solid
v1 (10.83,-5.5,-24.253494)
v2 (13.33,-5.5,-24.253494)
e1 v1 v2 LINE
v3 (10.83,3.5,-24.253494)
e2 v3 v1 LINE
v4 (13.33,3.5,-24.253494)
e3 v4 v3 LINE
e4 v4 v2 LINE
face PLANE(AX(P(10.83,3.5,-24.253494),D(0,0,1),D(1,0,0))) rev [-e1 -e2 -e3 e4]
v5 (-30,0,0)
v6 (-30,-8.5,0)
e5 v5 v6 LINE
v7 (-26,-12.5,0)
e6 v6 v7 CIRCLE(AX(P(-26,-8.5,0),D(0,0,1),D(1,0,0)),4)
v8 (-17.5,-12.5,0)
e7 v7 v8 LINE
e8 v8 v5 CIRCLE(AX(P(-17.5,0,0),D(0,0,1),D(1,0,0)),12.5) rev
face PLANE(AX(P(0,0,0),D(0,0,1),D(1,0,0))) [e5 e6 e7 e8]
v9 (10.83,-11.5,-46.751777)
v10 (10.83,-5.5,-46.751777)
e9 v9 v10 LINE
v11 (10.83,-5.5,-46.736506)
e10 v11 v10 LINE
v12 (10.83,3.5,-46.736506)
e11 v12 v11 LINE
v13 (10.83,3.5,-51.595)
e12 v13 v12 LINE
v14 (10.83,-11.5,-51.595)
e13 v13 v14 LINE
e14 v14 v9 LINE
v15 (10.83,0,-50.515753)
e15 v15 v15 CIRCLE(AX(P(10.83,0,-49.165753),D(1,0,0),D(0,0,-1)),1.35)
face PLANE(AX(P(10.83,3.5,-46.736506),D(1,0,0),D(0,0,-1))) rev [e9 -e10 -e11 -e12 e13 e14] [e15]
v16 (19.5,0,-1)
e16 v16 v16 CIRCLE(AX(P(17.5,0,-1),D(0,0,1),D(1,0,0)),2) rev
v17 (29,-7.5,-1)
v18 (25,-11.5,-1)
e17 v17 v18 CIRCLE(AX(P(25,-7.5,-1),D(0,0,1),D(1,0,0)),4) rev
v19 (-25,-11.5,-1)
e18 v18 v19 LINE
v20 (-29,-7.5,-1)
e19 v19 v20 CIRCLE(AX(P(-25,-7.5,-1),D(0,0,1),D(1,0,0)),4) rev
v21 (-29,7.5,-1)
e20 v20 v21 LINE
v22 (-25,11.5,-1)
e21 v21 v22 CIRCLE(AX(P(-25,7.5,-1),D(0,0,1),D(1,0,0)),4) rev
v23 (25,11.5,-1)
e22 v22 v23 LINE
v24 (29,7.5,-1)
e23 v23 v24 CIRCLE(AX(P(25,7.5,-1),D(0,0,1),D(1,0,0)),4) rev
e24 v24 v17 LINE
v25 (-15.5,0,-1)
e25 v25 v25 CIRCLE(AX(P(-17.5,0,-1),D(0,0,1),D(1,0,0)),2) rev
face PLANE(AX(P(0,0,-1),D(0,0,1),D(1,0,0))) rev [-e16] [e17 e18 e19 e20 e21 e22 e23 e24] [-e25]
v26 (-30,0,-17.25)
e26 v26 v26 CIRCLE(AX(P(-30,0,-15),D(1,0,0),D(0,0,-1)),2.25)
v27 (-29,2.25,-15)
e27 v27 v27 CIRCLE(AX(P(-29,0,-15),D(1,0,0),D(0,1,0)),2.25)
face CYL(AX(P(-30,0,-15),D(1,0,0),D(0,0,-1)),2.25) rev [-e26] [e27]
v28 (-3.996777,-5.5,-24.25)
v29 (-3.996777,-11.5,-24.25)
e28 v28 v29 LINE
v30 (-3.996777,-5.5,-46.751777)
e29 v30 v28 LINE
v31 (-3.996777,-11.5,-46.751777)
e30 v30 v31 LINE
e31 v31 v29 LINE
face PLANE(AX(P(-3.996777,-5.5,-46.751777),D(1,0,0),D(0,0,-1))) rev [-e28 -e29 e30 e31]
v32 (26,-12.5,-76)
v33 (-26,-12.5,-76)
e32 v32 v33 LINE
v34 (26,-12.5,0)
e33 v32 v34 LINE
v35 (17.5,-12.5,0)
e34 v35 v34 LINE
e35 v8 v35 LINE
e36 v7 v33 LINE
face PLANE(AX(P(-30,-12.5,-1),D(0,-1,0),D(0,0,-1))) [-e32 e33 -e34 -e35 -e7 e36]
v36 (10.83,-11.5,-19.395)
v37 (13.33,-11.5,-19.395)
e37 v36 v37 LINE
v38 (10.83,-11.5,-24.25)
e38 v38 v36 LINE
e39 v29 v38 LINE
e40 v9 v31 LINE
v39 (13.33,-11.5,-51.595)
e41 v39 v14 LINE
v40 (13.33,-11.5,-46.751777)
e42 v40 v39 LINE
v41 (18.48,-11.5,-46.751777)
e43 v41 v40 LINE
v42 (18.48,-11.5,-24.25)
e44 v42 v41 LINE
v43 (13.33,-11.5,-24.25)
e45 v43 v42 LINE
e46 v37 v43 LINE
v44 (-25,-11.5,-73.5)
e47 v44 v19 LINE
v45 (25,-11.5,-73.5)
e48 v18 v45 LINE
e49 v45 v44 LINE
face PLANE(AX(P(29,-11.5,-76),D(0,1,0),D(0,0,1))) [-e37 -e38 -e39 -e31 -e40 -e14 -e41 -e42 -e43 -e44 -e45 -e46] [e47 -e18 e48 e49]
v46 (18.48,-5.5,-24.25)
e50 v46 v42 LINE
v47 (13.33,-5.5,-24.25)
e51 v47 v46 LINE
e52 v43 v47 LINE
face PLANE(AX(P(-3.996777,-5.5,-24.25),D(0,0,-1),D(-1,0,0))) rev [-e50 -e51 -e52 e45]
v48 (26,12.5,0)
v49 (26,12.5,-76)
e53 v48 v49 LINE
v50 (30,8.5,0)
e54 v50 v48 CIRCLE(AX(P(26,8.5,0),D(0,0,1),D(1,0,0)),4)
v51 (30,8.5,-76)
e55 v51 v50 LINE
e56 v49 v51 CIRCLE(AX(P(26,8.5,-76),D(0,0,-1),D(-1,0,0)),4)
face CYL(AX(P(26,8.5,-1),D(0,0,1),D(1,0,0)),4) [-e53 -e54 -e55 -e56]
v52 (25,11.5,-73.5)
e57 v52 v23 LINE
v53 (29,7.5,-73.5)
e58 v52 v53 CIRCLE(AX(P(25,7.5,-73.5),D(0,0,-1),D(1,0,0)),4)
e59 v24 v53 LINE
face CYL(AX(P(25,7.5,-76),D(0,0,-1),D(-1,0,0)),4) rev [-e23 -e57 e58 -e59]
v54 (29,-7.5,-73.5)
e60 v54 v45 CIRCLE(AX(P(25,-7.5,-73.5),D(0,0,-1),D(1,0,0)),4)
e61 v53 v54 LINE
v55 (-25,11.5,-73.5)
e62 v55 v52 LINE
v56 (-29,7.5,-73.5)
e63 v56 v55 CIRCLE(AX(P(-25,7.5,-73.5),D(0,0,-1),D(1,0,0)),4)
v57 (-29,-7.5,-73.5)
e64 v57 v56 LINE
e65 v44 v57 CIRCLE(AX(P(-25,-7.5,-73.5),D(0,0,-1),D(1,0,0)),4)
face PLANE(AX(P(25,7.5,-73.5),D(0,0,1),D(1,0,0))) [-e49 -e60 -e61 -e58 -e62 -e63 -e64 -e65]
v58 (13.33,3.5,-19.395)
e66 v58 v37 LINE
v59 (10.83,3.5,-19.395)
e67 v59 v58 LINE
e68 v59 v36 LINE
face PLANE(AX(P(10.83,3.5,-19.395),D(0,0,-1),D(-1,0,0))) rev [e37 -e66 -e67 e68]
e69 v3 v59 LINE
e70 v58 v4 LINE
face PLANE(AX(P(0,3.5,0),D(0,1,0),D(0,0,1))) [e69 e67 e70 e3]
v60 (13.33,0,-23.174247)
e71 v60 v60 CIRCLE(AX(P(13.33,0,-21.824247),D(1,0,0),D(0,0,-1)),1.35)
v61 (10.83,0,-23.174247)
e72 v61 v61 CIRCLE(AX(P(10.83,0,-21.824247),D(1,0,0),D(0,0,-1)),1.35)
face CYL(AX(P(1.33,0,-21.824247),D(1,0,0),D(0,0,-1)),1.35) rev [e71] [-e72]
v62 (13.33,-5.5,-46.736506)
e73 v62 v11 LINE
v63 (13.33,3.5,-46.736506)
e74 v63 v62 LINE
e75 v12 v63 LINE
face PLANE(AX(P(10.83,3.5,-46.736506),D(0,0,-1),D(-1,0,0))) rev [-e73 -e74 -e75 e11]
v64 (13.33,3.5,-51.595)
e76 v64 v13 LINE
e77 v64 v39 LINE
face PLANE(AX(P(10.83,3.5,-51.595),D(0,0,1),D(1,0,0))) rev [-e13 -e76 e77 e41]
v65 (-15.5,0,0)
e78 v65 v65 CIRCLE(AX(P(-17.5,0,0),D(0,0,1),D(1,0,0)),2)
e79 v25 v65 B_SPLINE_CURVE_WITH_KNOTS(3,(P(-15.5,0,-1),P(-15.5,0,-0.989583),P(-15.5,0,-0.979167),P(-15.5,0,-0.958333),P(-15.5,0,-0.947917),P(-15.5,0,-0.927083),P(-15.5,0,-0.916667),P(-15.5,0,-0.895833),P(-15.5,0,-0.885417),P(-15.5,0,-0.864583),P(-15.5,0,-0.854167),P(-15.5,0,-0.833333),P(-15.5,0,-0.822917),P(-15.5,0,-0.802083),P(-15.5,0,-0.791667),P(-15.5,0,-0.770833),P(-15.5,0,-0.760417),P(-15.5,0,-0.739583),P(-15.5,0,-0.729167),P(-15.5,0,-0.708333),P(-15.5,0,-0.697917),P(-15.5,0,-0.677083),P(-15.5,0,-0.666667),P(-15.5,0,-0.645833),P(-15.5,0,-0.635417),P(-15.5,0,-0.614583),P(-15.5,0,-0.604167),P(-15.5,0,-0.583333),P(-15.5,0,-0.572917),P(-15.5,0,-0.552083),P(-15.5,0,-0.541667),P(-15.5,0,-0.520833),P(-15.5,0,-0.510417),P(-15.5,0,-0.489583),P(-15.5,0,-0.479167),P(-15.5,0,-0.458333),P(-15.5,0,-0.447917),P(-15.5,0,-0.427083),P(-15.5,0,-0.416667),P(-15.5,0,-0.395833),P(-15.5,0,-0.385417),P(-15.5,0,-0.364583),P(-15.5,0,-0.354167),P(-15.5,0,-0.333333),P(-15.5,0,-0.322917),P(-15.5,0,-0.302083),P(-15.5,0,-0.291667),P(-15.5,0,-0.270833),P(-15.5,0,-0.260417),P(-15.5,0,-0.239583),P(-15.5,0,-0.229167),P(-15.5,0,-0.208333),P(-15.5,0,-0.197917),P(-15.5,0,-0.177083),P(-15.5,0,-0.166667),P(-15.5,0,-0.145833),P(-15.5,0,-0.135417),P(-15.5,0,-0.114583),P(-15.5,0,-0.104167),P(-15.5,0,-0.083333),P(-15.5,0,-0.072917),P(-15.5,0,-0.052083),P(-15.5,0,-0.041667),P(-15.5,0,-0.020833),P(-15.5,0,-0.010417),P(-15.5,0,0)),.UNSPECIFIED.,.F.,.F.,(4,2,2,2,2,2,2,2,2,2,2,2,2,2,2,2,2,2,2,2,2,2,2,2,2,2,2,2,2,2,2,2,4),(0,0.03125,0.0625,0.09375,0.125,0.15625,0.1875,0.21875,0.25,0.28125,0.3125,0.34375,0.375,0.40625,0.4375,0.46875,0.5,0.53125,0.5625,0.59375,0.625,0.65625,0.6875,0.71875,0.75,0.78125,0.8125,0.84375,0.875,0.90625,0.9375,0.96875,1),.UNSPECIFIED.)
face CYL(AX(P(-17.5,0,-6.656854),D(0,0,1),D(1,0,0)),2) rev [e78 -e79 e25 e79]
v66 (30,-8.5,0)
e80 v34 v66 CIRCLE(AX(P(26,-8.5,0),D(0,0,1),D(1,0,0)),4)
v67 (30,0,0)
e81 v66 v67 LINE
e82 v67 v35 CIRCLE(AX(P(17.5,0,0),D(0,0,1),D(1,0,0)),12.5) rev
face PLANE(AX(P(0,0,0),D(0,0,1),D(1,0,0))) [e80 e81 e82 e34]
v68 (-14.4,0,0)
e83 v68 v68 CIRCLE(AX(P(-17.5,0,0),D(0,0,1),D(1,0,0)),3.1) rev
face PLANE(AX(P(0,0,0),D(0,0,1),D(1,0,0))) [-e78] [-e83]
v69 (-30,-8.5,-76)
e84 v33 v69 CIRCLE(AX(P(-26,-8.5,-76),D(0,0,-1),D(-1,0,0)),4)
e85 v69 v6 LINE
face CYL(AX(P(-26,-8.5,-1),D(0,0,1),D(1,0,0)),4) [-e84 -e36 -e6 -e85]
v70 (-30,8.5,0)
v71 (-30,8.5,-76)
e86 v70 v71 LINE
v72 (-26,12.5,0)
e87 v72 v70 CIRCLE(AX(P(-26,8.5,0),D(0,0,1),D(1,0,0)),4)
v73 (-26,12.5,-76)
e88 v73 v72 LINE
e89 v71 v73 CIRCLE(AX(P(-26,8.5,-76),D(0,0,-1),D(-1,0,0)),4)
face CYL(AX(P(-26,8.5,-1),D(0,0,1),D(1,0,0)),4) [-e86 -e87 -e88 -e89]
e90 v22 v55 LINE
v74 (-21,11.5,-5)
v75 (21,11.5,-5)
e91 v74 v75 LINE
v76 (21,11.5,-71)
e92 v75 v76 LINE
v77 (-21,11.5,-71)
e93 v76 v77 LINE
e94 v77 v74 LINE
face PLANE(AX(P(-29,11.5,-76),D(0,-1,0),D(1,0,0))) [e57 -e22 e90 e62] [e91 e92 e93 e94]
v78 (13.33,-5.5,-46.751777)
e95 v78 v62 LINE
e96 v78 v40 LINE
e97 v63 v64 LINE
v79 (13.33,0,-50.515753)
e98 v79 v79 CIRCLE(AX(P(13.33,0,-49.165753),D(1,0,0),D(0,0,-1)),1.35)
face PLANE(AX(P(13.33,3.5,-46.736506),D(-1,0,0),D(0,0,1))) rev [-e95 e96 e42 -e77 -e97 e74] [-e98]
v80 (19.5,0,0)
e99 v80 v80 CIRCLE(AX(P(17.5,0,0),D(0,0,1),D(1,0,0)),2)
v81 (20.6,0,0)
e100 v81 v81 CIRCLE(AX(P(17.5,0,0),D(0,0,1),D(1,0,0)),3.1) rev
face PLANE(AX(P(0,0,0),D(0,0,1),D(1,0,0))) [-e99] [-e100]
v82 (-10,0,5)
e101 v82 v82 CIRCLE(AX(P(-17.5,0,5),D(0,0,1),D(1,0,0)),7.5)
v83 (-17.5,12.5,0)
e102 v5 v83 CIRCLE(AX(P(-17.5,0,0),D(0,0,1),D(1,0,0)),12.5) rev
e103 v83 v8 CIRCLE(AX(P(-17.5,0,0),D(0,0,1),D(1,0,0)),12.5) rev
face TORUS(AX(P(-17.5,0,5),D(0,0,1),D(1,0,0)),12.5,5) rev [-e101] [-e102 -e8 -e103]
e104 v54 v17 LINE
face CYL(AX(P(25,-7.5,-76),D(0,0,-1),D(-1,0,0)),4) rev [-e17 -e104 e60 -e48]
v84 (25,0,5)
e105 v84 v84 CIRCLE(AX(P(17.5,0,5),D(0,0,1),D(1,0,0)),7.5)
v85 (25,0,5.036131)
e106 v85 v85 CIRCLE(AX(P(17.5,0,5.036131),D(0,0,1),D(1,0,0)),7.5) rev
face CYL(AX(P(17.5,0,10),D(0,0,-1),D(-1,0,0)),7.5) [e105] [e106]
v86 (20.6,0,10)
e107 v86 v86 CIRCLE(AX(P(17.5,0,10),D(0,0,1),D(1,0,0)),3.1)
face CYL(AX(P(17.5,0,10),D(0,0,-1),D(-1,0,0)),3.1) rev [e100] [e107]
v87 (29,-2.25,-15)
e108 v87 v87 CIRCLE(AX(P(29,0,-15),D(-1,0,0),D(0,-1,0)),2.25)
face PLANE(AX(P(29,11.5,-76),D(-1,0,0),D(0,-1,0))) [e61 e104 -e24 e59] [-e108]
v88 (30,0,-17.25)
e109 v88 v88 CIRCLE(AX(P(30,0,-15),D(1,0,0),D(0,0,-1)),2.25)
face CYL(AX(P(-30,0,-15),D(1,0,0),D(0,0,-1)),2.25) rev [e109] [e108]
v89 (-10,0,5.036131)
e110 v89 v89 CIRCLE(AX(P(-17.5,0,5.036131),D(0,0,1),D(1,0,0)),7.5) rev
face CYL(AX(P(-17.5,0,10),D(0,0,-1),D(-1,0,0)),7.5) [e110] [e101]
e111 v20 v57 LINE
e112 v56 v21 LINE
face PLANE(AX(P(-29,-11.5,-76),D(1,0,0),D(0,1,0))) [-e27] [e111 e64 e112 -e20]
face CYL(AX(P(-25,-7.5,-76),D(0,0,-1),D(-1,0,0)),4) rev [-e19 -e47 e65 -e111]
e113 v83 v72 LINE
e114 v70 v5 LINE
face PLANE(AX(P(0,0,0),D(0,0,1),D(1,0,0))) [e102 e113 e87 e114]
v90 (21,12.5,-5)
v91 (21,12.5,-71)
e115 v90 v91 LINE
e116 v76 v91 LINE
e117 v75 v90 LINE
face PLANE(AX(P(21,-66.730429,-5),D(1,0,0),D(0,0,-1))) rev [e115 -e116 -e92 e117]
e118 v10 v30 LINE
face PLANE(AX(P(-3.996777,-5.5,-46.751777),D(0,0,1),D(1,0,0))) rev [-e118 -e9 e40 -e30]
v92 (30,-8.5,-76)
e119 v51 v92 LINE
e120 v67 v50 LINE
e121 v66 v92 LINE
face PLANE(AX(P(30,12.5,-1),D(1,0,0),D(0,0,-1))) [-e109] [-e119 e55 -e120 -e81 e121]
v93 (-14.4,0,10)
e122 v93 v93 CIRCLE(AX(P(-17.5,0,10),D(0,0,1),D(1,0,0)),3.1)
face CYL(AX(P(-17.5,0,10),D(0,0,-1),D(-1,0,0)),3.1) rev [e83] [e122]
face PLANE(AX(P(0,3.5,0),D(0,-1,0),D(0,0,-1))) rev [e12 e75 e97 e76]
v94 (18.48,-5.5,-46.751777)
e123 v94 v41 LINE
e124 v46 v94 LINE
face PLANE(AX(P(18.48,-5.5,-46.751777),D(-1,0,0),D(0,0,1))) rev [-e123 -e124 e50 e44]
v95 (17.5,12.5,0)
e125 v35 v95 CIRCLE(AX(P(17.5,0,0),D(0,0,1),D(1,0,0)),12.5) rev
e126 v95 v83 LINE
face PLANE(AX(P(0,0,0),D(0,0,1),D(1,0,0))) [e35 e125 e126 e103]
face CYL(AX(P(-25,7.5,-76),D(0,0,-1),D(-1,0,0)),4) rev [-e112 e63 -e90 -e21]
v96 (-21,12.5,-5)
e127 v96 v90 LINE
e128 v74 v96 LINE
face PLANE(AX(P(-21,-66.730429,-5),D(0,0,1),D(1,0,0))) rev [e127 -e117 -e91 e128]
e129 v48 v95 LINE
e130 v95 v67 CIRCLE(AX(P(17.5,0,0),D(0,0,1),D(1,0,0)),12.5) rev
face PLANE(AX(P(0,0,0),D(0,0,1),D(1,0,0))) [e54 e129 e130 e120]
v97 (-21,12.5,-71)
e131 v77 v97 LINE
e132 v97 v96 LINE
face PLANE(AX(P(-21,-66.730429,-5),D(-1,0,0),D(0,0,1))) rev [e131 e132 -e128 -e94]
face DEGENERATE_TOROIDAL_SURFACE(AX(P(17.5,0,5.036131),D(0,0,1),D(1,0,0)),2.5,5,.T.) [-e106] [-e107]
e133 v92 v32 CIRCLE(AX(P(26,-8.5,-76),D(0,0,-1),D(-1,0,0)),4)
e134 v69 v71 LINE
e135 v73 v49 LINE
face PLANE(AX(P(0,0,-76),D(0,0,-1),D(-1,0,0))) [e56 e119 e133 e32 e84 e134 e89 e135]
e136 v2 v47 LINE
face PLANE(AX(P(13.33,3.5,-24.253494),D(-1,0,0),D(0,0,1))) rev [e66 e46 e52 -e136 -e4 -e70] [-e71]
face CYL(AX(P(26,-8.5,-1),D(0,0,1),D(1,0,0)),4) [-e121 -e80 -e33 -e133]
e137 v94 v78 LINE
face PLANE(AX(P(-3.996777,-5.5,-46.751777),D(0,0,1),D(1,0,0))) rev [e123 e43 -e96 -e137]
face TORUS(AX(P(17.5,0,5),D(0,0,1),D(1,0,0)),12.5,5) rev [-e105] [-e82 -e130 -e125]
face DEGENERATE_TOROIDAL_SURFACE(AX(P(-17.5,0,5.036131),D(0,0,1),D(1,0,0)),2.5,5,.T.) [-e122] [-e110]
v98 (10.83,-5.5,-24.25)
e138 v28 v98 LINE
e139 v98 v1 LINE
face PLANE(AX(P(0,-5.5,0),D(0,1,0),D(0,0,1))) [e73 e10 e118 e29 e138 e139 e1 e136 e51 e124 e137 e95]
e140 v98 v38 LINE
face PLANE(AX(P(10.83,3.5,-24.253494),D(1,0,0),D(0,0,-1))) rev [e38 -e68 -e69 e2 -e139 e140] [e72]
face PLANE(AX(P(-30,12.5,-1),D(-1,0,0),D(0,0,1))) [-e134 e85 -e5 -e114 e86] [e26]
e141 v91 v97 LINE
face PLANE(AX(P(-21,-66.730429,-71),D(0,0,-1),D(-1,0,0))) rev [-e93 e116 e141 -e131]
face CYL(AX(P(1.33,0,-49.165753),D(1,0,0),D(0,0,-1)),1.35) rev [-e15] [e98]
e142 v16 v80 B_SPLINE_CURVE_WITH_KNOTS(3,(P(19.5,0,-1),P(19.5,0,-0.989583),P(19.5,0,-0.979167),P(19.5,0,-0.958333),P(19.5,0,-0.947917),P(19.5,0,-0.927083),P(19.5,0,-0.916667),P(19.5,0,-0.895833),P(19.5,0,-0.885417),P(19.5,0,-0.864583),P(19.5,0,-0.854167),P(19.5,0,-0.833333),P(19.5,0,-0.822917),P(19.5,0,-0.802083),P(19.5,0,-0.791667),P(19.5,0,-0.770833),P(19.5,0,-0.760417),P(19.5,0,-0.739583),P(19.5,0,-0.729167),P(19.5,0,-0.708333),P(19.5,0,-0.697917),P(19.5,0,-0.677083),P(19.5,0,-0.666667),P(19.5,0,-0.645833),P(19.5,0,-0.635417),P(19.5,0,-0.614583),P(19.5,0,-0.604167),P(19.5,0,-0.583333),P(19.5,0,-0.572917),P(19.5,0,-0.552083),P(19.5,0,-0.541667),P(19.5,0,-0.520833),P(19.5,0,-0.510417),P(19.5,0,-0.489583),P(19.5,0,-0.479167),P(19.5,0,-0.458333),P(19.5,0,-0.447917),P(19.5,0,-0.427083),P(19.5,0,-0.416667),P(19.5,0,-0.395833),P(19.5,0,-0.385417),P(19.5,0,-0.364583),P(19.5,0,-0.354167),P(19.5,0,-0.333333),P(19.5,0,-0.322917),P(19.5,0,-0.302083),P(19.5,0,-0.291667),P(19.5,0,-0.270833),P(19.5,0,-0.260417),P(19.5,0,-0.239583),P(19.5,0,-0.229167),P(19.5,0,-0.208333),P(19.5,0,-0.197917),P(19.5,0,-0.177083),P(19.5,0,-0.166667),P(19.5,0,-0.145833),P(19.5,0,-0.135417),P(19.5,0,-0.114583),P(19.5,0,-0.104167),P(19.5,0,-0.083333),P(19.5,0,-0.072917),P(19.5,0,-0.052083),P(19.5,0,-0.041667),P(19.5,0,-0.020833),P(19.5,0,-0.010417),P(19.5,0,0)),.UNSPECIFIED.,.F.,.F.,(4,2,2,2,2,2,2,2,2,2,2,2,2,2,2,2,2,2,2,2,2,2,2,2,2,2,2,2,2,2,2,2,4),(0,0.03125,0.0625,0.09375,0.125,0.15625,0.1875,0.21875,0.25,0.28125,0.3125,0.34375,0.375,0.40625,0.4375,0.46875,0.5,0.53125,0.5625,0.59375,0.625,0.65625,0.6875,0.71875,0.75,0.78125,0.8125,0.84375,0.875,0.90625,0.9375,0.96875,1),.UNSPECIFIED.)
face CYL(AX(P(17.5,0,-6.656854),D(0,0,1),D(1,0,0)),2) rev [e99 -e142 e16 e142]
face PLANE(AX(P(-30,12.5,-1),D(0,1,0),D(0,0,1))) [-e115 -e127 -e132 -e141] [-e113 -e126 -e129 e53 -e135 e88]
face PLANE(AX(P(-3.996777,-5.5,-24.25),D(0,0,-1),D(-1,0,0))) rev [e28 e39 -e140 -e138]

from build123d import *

# Parameters (mm, degrees)
SKETCH1_W           = 60
SKETCH1_H           = 25
BOSS_EXTRUDE1_DEPTH = 1
SKETCH2_W           = 60
SKETCH2_H           = 25
SKETCH2_W_2         = 58
SKETCH2_H_2         = 23
BOSS_EXTRUDE2_DEPTH = 75
FILLET2_R           = 4
SKETCH4_R           = 7.5
SKETCH4_R_2         = 3.1
BOSS_EXTRUDE3_DEPTH = 10
FILLET3_R           = 5
SKETCH18_R          = 2
CUT_EXTRUDE6_DEPTH  = 1
SKETCH5_R           = 2.25
CUT_EXTRUDE1_DEPTH  = 98.63324229
SKETCH10_W          = 22.476776695
SKETCH10_H          = 22.501776695
BOSS_EXTRUDE4_DEPTH = 6
SKETCH12_W          = 2.5
SKETCH12_H          = 4.858493649
BOSS_EXTRUDE5_DEPTH = 15
SKETCH13_R          = 1.35
CUT_EXTRUDE3_DEPTH  = 12
SKETCH19_W          = 42
SKETCH19_H          = 66
CUT_EXTRUDE7_DEPTH  = 1
BOSS_EXTRUDE7_DEPTH = 2.5


with BuildPart() as part:
    # Sketch1 → Boss-Extrude1 (new body)
    with BuildSketch(Plane.XY):
        Rectangle(SKETCH1_W, SKETCH1_H)
    extrude(amount=-BOSS_EXTRUDE1_DEPTH)

    # Sketch2 → Boss-Extrude2 (add)
    with BuildSketch(Plane(origin=(0, 0, -1), x_dir=(-1, 0, 0), z_dir=(0, 0, -1))):
        Rectangle(SKETCH2_W, SKETCH2_H)
        Rectangle(SKETCH2_W_2, SKETCH2_H_2, mode=Mode.SUBTRACT)
    extrude(amount=BOSS_EXTRUDE2_DEPTH)

    # Fillet2
    fillet2_edges = [part.edges().sort_by_distance(p)[0] for p in [
        (-29, 11.5, -38.5),
        (29, 11.5, -38.5),
        (29, -11.5, -38.5),
        (-29, -11.5, -38.5),
        (30, -12.5, -38),
        (-30, -12.5, -38),
        (-30, 12.5, -38),
        (30, 12.5, -38),
    ]]
    fillet(fillet2_edges, radius=FILLET2_R)

    # Sketch4 → Boss-Extrude3 (add)
    # profile 1 of 2: a face of its own
    with BuildSketch(Plane.XY):
        with Locations((-17.5, 0)):
            Circle(SKETCH4_R)
        with Locations((-17.5, 0)):
            Circle(SKETCH4_R_2, mode=Mode.SUBTRACT)
    # profile 2 of 2: a face of its own
    with BuildSketch(Plane.XY):
        with Locations((17.5, 0)):
            Circle(SKETCH4_R)
        with Locations((17.5, 0)):
            Circle(SKETCH4_R_2, mode=Mode.SUBTRACT)
    extrude(amount=BOSS_EXTRUDE3_DEPTH)

    # Fillet3
    # the kernel refuses this fillet: 5 mm, written as the material it adds along each edge
    with BuildSketch(Plane(origin=(17.5, 0, 0), x_dir=(1, 0, 0), z_dir=(0, -1, 0))) as fillet3_piece_1:
        with BuildLine():
            CenterArc((7.5 + FILLET3_R, FILLET3_R), FILLET3_R, 180, 90)
            Line((7.5, FILLET3_R), (7.5, 0))
            Line((7.5, 0), (7.5 + FILLET3_R, 0))
        make_face()
    revolve(axis=Axis((17.5, 0, 0), (0, 0, 1)))
    with BuildSketch(Plane(origin=(-17.5, 0, 0), x_dir=(1, 0, 0), z_dir=(0, -1, 0))) as fillet3_piece_2:
        with BuildLine():
            CenterArc((7.5 + FILLET3_R, FILLET3_R), FILLET3_R, 180, 90)
            Line((7.5, FILLET3_R), (7.5, 0))
            Line((7.5, 0), (7.5 + FILLET3_R, 0))
        make_face()
    revolve(axis=Axis((-17.5, 0, 0), (0, 0, 1)))
    # the kernel refuses this fillet: 5 mm, written as the material it takes off along each edge
    with BuildSketch(Plane(origin=(17.5, 0, 10), x_dir=(1, 0, 0), z_dir=(0, -1, 0))) as fillet3_2_piece_1:
        with BuildLine():
            CenterArc((2.5, -4.963869458), FILLET3_R, 0, 83.107897421)
            Line((3.1, 0), (7.5, 0))
            Line((7.5, 0), (7.5, -4.963869458))
        make_face()
    revolve(axis=Axis((17.5, 0, 10), (0, 0, 1)), mode=Mode.SUBTRACT)
    with BuildSketch(Plane(origin=(-17.5, 0, 10), x_dir=(1, 0, 0), z_dir=(0, -1, 0))) as fillet3_2_piece_2:
        with BuildLine():
            CenterArc((2.5, -4.963869458), FILLET3_R, 0, 83.107897421)
            Line((3.1, 0), (7.5, 0))
            Line((7.5, 0), (7.5, -4.963869458))
        make_face()
    revolve(axis=Axis((-17.5, 0, 10), (0, 0, 1)), mode=Mode.SUBTRACT)

    # Sketch18 → Cut-Extrude6 (cut)
    with BuildSketch(Plane.XY):
        with Locations((-17.5, 0)):
            Circle(SKETCH18_R)
        with Locations((17.5, 0)):
            Circle(SKETCH18_R)
    extrude(amount=-CUT_EXTRUDE6_DEPTH, mode=Mode.SUBTRACT)

    # Sketch5 → Cut-Extrude1 (cut, through all)
    with BuildSketch(Plane(origin=(30, 0, 0), x_dir=(0, 0, -1), z_dir=(1, 0, 0))):
        with Locations((15, 0)):
            Circle(SKETCH5_R)
    extrude(amount=-CUT_EXTRUDE1_DEPTH, mode=Mode.SUBTRACT)

    # Sketch10 → Boss-Extrude4 (add)
    with BuildSketch(Plane(origin=(0, -11.5, 0), x_dir=(1, 0, 0), z_dir=(0, 1, 0))):
        with Locations((7.241611652, 35.500888348)):
            Rectangle(SKETCH10_W, SKETCH10_H)
    extrude(amount=BOSS_EXTRUDE4_DEPTH)

    # Sketch12 → Boss-Extrude5 (add)
    with BuildSketch(Plane(origin=(0, -11.5, 0), x_dir=(1, 0, 0), z_dir=(0, 1, 0))):
        with Locations((12.08, 21.824246825)):
            Rectangle(SKETCH12_W, SKETCH12_H)
        with Locations((12.08, 49.165753176)):
            Rectangle(SKETCH12_W, SKETCH12_H)
    extrude(amount=BOSS_EXTRUDE5_DEPTH)

    # Sketch13 → Cut-Extrude3 (cut)
    with BuildSketch(Plane(origin=(13.33, 0, 0), x_dir=(0, 0, -1), z_dir=(1, 0, 0))):
        with Locations((21.82424682, 0)):
            Circle(SKETCH13_R)
        with Locations((49.165753171, 0)):
            Circle(SKETCH13_R)
    extrude(amount=-CUT_EXTRUDE3_DEPTH, mode=Mode.SUBTRACT)

    # Sketch19 → Cut-Extrude7 (cut)
    with BuildSketch(Plane(origin=(0, 12.5, 0), x_dir=(1, 0, 0), z_dir=(0, 1, 0))):
        with Locations((0, 38)):
            Rectangle(SKETCH19_W, SKETCH19_H)
    extrude(amount=-CUT_EXTRUDE7_DEPTH, mode=Mode.SUBTRACT)

    # Sketch20 → Boss-Extrude7 (add)
    with BuildSketch(Plane(origin=(0, 0, -76), x_dir=(-1, 0, 0), z_dir=(0, 0, -1))):
        with BuildLine():
            Line((-25, 11.5), (25, 11.5))
            ThreePointArc((25, 11.5), (27.828427125, 10.328427125), (29, 7.5))
            Line((29, 7.5), (29, -7.5))
            ThreePointArc((29, -7.5), (27.828427125, -10.328427125), (25, -11.5))
            Line((25, -11.5), (-25, -11.5))
            ThreePointArc((-25, -11.5), (-27.828427125, -10.328427125), (-29, -7.5))
            Line((-29, -7.5), (-29, 7.5))
            ThreePointArc((-29, 7.5), (-27.828427125, 10.328427125), (-25, 11.5))
        make_face()
    extrude(amount=-BOSS_EXTRUDE7_DEPTH)


solid = part.part
